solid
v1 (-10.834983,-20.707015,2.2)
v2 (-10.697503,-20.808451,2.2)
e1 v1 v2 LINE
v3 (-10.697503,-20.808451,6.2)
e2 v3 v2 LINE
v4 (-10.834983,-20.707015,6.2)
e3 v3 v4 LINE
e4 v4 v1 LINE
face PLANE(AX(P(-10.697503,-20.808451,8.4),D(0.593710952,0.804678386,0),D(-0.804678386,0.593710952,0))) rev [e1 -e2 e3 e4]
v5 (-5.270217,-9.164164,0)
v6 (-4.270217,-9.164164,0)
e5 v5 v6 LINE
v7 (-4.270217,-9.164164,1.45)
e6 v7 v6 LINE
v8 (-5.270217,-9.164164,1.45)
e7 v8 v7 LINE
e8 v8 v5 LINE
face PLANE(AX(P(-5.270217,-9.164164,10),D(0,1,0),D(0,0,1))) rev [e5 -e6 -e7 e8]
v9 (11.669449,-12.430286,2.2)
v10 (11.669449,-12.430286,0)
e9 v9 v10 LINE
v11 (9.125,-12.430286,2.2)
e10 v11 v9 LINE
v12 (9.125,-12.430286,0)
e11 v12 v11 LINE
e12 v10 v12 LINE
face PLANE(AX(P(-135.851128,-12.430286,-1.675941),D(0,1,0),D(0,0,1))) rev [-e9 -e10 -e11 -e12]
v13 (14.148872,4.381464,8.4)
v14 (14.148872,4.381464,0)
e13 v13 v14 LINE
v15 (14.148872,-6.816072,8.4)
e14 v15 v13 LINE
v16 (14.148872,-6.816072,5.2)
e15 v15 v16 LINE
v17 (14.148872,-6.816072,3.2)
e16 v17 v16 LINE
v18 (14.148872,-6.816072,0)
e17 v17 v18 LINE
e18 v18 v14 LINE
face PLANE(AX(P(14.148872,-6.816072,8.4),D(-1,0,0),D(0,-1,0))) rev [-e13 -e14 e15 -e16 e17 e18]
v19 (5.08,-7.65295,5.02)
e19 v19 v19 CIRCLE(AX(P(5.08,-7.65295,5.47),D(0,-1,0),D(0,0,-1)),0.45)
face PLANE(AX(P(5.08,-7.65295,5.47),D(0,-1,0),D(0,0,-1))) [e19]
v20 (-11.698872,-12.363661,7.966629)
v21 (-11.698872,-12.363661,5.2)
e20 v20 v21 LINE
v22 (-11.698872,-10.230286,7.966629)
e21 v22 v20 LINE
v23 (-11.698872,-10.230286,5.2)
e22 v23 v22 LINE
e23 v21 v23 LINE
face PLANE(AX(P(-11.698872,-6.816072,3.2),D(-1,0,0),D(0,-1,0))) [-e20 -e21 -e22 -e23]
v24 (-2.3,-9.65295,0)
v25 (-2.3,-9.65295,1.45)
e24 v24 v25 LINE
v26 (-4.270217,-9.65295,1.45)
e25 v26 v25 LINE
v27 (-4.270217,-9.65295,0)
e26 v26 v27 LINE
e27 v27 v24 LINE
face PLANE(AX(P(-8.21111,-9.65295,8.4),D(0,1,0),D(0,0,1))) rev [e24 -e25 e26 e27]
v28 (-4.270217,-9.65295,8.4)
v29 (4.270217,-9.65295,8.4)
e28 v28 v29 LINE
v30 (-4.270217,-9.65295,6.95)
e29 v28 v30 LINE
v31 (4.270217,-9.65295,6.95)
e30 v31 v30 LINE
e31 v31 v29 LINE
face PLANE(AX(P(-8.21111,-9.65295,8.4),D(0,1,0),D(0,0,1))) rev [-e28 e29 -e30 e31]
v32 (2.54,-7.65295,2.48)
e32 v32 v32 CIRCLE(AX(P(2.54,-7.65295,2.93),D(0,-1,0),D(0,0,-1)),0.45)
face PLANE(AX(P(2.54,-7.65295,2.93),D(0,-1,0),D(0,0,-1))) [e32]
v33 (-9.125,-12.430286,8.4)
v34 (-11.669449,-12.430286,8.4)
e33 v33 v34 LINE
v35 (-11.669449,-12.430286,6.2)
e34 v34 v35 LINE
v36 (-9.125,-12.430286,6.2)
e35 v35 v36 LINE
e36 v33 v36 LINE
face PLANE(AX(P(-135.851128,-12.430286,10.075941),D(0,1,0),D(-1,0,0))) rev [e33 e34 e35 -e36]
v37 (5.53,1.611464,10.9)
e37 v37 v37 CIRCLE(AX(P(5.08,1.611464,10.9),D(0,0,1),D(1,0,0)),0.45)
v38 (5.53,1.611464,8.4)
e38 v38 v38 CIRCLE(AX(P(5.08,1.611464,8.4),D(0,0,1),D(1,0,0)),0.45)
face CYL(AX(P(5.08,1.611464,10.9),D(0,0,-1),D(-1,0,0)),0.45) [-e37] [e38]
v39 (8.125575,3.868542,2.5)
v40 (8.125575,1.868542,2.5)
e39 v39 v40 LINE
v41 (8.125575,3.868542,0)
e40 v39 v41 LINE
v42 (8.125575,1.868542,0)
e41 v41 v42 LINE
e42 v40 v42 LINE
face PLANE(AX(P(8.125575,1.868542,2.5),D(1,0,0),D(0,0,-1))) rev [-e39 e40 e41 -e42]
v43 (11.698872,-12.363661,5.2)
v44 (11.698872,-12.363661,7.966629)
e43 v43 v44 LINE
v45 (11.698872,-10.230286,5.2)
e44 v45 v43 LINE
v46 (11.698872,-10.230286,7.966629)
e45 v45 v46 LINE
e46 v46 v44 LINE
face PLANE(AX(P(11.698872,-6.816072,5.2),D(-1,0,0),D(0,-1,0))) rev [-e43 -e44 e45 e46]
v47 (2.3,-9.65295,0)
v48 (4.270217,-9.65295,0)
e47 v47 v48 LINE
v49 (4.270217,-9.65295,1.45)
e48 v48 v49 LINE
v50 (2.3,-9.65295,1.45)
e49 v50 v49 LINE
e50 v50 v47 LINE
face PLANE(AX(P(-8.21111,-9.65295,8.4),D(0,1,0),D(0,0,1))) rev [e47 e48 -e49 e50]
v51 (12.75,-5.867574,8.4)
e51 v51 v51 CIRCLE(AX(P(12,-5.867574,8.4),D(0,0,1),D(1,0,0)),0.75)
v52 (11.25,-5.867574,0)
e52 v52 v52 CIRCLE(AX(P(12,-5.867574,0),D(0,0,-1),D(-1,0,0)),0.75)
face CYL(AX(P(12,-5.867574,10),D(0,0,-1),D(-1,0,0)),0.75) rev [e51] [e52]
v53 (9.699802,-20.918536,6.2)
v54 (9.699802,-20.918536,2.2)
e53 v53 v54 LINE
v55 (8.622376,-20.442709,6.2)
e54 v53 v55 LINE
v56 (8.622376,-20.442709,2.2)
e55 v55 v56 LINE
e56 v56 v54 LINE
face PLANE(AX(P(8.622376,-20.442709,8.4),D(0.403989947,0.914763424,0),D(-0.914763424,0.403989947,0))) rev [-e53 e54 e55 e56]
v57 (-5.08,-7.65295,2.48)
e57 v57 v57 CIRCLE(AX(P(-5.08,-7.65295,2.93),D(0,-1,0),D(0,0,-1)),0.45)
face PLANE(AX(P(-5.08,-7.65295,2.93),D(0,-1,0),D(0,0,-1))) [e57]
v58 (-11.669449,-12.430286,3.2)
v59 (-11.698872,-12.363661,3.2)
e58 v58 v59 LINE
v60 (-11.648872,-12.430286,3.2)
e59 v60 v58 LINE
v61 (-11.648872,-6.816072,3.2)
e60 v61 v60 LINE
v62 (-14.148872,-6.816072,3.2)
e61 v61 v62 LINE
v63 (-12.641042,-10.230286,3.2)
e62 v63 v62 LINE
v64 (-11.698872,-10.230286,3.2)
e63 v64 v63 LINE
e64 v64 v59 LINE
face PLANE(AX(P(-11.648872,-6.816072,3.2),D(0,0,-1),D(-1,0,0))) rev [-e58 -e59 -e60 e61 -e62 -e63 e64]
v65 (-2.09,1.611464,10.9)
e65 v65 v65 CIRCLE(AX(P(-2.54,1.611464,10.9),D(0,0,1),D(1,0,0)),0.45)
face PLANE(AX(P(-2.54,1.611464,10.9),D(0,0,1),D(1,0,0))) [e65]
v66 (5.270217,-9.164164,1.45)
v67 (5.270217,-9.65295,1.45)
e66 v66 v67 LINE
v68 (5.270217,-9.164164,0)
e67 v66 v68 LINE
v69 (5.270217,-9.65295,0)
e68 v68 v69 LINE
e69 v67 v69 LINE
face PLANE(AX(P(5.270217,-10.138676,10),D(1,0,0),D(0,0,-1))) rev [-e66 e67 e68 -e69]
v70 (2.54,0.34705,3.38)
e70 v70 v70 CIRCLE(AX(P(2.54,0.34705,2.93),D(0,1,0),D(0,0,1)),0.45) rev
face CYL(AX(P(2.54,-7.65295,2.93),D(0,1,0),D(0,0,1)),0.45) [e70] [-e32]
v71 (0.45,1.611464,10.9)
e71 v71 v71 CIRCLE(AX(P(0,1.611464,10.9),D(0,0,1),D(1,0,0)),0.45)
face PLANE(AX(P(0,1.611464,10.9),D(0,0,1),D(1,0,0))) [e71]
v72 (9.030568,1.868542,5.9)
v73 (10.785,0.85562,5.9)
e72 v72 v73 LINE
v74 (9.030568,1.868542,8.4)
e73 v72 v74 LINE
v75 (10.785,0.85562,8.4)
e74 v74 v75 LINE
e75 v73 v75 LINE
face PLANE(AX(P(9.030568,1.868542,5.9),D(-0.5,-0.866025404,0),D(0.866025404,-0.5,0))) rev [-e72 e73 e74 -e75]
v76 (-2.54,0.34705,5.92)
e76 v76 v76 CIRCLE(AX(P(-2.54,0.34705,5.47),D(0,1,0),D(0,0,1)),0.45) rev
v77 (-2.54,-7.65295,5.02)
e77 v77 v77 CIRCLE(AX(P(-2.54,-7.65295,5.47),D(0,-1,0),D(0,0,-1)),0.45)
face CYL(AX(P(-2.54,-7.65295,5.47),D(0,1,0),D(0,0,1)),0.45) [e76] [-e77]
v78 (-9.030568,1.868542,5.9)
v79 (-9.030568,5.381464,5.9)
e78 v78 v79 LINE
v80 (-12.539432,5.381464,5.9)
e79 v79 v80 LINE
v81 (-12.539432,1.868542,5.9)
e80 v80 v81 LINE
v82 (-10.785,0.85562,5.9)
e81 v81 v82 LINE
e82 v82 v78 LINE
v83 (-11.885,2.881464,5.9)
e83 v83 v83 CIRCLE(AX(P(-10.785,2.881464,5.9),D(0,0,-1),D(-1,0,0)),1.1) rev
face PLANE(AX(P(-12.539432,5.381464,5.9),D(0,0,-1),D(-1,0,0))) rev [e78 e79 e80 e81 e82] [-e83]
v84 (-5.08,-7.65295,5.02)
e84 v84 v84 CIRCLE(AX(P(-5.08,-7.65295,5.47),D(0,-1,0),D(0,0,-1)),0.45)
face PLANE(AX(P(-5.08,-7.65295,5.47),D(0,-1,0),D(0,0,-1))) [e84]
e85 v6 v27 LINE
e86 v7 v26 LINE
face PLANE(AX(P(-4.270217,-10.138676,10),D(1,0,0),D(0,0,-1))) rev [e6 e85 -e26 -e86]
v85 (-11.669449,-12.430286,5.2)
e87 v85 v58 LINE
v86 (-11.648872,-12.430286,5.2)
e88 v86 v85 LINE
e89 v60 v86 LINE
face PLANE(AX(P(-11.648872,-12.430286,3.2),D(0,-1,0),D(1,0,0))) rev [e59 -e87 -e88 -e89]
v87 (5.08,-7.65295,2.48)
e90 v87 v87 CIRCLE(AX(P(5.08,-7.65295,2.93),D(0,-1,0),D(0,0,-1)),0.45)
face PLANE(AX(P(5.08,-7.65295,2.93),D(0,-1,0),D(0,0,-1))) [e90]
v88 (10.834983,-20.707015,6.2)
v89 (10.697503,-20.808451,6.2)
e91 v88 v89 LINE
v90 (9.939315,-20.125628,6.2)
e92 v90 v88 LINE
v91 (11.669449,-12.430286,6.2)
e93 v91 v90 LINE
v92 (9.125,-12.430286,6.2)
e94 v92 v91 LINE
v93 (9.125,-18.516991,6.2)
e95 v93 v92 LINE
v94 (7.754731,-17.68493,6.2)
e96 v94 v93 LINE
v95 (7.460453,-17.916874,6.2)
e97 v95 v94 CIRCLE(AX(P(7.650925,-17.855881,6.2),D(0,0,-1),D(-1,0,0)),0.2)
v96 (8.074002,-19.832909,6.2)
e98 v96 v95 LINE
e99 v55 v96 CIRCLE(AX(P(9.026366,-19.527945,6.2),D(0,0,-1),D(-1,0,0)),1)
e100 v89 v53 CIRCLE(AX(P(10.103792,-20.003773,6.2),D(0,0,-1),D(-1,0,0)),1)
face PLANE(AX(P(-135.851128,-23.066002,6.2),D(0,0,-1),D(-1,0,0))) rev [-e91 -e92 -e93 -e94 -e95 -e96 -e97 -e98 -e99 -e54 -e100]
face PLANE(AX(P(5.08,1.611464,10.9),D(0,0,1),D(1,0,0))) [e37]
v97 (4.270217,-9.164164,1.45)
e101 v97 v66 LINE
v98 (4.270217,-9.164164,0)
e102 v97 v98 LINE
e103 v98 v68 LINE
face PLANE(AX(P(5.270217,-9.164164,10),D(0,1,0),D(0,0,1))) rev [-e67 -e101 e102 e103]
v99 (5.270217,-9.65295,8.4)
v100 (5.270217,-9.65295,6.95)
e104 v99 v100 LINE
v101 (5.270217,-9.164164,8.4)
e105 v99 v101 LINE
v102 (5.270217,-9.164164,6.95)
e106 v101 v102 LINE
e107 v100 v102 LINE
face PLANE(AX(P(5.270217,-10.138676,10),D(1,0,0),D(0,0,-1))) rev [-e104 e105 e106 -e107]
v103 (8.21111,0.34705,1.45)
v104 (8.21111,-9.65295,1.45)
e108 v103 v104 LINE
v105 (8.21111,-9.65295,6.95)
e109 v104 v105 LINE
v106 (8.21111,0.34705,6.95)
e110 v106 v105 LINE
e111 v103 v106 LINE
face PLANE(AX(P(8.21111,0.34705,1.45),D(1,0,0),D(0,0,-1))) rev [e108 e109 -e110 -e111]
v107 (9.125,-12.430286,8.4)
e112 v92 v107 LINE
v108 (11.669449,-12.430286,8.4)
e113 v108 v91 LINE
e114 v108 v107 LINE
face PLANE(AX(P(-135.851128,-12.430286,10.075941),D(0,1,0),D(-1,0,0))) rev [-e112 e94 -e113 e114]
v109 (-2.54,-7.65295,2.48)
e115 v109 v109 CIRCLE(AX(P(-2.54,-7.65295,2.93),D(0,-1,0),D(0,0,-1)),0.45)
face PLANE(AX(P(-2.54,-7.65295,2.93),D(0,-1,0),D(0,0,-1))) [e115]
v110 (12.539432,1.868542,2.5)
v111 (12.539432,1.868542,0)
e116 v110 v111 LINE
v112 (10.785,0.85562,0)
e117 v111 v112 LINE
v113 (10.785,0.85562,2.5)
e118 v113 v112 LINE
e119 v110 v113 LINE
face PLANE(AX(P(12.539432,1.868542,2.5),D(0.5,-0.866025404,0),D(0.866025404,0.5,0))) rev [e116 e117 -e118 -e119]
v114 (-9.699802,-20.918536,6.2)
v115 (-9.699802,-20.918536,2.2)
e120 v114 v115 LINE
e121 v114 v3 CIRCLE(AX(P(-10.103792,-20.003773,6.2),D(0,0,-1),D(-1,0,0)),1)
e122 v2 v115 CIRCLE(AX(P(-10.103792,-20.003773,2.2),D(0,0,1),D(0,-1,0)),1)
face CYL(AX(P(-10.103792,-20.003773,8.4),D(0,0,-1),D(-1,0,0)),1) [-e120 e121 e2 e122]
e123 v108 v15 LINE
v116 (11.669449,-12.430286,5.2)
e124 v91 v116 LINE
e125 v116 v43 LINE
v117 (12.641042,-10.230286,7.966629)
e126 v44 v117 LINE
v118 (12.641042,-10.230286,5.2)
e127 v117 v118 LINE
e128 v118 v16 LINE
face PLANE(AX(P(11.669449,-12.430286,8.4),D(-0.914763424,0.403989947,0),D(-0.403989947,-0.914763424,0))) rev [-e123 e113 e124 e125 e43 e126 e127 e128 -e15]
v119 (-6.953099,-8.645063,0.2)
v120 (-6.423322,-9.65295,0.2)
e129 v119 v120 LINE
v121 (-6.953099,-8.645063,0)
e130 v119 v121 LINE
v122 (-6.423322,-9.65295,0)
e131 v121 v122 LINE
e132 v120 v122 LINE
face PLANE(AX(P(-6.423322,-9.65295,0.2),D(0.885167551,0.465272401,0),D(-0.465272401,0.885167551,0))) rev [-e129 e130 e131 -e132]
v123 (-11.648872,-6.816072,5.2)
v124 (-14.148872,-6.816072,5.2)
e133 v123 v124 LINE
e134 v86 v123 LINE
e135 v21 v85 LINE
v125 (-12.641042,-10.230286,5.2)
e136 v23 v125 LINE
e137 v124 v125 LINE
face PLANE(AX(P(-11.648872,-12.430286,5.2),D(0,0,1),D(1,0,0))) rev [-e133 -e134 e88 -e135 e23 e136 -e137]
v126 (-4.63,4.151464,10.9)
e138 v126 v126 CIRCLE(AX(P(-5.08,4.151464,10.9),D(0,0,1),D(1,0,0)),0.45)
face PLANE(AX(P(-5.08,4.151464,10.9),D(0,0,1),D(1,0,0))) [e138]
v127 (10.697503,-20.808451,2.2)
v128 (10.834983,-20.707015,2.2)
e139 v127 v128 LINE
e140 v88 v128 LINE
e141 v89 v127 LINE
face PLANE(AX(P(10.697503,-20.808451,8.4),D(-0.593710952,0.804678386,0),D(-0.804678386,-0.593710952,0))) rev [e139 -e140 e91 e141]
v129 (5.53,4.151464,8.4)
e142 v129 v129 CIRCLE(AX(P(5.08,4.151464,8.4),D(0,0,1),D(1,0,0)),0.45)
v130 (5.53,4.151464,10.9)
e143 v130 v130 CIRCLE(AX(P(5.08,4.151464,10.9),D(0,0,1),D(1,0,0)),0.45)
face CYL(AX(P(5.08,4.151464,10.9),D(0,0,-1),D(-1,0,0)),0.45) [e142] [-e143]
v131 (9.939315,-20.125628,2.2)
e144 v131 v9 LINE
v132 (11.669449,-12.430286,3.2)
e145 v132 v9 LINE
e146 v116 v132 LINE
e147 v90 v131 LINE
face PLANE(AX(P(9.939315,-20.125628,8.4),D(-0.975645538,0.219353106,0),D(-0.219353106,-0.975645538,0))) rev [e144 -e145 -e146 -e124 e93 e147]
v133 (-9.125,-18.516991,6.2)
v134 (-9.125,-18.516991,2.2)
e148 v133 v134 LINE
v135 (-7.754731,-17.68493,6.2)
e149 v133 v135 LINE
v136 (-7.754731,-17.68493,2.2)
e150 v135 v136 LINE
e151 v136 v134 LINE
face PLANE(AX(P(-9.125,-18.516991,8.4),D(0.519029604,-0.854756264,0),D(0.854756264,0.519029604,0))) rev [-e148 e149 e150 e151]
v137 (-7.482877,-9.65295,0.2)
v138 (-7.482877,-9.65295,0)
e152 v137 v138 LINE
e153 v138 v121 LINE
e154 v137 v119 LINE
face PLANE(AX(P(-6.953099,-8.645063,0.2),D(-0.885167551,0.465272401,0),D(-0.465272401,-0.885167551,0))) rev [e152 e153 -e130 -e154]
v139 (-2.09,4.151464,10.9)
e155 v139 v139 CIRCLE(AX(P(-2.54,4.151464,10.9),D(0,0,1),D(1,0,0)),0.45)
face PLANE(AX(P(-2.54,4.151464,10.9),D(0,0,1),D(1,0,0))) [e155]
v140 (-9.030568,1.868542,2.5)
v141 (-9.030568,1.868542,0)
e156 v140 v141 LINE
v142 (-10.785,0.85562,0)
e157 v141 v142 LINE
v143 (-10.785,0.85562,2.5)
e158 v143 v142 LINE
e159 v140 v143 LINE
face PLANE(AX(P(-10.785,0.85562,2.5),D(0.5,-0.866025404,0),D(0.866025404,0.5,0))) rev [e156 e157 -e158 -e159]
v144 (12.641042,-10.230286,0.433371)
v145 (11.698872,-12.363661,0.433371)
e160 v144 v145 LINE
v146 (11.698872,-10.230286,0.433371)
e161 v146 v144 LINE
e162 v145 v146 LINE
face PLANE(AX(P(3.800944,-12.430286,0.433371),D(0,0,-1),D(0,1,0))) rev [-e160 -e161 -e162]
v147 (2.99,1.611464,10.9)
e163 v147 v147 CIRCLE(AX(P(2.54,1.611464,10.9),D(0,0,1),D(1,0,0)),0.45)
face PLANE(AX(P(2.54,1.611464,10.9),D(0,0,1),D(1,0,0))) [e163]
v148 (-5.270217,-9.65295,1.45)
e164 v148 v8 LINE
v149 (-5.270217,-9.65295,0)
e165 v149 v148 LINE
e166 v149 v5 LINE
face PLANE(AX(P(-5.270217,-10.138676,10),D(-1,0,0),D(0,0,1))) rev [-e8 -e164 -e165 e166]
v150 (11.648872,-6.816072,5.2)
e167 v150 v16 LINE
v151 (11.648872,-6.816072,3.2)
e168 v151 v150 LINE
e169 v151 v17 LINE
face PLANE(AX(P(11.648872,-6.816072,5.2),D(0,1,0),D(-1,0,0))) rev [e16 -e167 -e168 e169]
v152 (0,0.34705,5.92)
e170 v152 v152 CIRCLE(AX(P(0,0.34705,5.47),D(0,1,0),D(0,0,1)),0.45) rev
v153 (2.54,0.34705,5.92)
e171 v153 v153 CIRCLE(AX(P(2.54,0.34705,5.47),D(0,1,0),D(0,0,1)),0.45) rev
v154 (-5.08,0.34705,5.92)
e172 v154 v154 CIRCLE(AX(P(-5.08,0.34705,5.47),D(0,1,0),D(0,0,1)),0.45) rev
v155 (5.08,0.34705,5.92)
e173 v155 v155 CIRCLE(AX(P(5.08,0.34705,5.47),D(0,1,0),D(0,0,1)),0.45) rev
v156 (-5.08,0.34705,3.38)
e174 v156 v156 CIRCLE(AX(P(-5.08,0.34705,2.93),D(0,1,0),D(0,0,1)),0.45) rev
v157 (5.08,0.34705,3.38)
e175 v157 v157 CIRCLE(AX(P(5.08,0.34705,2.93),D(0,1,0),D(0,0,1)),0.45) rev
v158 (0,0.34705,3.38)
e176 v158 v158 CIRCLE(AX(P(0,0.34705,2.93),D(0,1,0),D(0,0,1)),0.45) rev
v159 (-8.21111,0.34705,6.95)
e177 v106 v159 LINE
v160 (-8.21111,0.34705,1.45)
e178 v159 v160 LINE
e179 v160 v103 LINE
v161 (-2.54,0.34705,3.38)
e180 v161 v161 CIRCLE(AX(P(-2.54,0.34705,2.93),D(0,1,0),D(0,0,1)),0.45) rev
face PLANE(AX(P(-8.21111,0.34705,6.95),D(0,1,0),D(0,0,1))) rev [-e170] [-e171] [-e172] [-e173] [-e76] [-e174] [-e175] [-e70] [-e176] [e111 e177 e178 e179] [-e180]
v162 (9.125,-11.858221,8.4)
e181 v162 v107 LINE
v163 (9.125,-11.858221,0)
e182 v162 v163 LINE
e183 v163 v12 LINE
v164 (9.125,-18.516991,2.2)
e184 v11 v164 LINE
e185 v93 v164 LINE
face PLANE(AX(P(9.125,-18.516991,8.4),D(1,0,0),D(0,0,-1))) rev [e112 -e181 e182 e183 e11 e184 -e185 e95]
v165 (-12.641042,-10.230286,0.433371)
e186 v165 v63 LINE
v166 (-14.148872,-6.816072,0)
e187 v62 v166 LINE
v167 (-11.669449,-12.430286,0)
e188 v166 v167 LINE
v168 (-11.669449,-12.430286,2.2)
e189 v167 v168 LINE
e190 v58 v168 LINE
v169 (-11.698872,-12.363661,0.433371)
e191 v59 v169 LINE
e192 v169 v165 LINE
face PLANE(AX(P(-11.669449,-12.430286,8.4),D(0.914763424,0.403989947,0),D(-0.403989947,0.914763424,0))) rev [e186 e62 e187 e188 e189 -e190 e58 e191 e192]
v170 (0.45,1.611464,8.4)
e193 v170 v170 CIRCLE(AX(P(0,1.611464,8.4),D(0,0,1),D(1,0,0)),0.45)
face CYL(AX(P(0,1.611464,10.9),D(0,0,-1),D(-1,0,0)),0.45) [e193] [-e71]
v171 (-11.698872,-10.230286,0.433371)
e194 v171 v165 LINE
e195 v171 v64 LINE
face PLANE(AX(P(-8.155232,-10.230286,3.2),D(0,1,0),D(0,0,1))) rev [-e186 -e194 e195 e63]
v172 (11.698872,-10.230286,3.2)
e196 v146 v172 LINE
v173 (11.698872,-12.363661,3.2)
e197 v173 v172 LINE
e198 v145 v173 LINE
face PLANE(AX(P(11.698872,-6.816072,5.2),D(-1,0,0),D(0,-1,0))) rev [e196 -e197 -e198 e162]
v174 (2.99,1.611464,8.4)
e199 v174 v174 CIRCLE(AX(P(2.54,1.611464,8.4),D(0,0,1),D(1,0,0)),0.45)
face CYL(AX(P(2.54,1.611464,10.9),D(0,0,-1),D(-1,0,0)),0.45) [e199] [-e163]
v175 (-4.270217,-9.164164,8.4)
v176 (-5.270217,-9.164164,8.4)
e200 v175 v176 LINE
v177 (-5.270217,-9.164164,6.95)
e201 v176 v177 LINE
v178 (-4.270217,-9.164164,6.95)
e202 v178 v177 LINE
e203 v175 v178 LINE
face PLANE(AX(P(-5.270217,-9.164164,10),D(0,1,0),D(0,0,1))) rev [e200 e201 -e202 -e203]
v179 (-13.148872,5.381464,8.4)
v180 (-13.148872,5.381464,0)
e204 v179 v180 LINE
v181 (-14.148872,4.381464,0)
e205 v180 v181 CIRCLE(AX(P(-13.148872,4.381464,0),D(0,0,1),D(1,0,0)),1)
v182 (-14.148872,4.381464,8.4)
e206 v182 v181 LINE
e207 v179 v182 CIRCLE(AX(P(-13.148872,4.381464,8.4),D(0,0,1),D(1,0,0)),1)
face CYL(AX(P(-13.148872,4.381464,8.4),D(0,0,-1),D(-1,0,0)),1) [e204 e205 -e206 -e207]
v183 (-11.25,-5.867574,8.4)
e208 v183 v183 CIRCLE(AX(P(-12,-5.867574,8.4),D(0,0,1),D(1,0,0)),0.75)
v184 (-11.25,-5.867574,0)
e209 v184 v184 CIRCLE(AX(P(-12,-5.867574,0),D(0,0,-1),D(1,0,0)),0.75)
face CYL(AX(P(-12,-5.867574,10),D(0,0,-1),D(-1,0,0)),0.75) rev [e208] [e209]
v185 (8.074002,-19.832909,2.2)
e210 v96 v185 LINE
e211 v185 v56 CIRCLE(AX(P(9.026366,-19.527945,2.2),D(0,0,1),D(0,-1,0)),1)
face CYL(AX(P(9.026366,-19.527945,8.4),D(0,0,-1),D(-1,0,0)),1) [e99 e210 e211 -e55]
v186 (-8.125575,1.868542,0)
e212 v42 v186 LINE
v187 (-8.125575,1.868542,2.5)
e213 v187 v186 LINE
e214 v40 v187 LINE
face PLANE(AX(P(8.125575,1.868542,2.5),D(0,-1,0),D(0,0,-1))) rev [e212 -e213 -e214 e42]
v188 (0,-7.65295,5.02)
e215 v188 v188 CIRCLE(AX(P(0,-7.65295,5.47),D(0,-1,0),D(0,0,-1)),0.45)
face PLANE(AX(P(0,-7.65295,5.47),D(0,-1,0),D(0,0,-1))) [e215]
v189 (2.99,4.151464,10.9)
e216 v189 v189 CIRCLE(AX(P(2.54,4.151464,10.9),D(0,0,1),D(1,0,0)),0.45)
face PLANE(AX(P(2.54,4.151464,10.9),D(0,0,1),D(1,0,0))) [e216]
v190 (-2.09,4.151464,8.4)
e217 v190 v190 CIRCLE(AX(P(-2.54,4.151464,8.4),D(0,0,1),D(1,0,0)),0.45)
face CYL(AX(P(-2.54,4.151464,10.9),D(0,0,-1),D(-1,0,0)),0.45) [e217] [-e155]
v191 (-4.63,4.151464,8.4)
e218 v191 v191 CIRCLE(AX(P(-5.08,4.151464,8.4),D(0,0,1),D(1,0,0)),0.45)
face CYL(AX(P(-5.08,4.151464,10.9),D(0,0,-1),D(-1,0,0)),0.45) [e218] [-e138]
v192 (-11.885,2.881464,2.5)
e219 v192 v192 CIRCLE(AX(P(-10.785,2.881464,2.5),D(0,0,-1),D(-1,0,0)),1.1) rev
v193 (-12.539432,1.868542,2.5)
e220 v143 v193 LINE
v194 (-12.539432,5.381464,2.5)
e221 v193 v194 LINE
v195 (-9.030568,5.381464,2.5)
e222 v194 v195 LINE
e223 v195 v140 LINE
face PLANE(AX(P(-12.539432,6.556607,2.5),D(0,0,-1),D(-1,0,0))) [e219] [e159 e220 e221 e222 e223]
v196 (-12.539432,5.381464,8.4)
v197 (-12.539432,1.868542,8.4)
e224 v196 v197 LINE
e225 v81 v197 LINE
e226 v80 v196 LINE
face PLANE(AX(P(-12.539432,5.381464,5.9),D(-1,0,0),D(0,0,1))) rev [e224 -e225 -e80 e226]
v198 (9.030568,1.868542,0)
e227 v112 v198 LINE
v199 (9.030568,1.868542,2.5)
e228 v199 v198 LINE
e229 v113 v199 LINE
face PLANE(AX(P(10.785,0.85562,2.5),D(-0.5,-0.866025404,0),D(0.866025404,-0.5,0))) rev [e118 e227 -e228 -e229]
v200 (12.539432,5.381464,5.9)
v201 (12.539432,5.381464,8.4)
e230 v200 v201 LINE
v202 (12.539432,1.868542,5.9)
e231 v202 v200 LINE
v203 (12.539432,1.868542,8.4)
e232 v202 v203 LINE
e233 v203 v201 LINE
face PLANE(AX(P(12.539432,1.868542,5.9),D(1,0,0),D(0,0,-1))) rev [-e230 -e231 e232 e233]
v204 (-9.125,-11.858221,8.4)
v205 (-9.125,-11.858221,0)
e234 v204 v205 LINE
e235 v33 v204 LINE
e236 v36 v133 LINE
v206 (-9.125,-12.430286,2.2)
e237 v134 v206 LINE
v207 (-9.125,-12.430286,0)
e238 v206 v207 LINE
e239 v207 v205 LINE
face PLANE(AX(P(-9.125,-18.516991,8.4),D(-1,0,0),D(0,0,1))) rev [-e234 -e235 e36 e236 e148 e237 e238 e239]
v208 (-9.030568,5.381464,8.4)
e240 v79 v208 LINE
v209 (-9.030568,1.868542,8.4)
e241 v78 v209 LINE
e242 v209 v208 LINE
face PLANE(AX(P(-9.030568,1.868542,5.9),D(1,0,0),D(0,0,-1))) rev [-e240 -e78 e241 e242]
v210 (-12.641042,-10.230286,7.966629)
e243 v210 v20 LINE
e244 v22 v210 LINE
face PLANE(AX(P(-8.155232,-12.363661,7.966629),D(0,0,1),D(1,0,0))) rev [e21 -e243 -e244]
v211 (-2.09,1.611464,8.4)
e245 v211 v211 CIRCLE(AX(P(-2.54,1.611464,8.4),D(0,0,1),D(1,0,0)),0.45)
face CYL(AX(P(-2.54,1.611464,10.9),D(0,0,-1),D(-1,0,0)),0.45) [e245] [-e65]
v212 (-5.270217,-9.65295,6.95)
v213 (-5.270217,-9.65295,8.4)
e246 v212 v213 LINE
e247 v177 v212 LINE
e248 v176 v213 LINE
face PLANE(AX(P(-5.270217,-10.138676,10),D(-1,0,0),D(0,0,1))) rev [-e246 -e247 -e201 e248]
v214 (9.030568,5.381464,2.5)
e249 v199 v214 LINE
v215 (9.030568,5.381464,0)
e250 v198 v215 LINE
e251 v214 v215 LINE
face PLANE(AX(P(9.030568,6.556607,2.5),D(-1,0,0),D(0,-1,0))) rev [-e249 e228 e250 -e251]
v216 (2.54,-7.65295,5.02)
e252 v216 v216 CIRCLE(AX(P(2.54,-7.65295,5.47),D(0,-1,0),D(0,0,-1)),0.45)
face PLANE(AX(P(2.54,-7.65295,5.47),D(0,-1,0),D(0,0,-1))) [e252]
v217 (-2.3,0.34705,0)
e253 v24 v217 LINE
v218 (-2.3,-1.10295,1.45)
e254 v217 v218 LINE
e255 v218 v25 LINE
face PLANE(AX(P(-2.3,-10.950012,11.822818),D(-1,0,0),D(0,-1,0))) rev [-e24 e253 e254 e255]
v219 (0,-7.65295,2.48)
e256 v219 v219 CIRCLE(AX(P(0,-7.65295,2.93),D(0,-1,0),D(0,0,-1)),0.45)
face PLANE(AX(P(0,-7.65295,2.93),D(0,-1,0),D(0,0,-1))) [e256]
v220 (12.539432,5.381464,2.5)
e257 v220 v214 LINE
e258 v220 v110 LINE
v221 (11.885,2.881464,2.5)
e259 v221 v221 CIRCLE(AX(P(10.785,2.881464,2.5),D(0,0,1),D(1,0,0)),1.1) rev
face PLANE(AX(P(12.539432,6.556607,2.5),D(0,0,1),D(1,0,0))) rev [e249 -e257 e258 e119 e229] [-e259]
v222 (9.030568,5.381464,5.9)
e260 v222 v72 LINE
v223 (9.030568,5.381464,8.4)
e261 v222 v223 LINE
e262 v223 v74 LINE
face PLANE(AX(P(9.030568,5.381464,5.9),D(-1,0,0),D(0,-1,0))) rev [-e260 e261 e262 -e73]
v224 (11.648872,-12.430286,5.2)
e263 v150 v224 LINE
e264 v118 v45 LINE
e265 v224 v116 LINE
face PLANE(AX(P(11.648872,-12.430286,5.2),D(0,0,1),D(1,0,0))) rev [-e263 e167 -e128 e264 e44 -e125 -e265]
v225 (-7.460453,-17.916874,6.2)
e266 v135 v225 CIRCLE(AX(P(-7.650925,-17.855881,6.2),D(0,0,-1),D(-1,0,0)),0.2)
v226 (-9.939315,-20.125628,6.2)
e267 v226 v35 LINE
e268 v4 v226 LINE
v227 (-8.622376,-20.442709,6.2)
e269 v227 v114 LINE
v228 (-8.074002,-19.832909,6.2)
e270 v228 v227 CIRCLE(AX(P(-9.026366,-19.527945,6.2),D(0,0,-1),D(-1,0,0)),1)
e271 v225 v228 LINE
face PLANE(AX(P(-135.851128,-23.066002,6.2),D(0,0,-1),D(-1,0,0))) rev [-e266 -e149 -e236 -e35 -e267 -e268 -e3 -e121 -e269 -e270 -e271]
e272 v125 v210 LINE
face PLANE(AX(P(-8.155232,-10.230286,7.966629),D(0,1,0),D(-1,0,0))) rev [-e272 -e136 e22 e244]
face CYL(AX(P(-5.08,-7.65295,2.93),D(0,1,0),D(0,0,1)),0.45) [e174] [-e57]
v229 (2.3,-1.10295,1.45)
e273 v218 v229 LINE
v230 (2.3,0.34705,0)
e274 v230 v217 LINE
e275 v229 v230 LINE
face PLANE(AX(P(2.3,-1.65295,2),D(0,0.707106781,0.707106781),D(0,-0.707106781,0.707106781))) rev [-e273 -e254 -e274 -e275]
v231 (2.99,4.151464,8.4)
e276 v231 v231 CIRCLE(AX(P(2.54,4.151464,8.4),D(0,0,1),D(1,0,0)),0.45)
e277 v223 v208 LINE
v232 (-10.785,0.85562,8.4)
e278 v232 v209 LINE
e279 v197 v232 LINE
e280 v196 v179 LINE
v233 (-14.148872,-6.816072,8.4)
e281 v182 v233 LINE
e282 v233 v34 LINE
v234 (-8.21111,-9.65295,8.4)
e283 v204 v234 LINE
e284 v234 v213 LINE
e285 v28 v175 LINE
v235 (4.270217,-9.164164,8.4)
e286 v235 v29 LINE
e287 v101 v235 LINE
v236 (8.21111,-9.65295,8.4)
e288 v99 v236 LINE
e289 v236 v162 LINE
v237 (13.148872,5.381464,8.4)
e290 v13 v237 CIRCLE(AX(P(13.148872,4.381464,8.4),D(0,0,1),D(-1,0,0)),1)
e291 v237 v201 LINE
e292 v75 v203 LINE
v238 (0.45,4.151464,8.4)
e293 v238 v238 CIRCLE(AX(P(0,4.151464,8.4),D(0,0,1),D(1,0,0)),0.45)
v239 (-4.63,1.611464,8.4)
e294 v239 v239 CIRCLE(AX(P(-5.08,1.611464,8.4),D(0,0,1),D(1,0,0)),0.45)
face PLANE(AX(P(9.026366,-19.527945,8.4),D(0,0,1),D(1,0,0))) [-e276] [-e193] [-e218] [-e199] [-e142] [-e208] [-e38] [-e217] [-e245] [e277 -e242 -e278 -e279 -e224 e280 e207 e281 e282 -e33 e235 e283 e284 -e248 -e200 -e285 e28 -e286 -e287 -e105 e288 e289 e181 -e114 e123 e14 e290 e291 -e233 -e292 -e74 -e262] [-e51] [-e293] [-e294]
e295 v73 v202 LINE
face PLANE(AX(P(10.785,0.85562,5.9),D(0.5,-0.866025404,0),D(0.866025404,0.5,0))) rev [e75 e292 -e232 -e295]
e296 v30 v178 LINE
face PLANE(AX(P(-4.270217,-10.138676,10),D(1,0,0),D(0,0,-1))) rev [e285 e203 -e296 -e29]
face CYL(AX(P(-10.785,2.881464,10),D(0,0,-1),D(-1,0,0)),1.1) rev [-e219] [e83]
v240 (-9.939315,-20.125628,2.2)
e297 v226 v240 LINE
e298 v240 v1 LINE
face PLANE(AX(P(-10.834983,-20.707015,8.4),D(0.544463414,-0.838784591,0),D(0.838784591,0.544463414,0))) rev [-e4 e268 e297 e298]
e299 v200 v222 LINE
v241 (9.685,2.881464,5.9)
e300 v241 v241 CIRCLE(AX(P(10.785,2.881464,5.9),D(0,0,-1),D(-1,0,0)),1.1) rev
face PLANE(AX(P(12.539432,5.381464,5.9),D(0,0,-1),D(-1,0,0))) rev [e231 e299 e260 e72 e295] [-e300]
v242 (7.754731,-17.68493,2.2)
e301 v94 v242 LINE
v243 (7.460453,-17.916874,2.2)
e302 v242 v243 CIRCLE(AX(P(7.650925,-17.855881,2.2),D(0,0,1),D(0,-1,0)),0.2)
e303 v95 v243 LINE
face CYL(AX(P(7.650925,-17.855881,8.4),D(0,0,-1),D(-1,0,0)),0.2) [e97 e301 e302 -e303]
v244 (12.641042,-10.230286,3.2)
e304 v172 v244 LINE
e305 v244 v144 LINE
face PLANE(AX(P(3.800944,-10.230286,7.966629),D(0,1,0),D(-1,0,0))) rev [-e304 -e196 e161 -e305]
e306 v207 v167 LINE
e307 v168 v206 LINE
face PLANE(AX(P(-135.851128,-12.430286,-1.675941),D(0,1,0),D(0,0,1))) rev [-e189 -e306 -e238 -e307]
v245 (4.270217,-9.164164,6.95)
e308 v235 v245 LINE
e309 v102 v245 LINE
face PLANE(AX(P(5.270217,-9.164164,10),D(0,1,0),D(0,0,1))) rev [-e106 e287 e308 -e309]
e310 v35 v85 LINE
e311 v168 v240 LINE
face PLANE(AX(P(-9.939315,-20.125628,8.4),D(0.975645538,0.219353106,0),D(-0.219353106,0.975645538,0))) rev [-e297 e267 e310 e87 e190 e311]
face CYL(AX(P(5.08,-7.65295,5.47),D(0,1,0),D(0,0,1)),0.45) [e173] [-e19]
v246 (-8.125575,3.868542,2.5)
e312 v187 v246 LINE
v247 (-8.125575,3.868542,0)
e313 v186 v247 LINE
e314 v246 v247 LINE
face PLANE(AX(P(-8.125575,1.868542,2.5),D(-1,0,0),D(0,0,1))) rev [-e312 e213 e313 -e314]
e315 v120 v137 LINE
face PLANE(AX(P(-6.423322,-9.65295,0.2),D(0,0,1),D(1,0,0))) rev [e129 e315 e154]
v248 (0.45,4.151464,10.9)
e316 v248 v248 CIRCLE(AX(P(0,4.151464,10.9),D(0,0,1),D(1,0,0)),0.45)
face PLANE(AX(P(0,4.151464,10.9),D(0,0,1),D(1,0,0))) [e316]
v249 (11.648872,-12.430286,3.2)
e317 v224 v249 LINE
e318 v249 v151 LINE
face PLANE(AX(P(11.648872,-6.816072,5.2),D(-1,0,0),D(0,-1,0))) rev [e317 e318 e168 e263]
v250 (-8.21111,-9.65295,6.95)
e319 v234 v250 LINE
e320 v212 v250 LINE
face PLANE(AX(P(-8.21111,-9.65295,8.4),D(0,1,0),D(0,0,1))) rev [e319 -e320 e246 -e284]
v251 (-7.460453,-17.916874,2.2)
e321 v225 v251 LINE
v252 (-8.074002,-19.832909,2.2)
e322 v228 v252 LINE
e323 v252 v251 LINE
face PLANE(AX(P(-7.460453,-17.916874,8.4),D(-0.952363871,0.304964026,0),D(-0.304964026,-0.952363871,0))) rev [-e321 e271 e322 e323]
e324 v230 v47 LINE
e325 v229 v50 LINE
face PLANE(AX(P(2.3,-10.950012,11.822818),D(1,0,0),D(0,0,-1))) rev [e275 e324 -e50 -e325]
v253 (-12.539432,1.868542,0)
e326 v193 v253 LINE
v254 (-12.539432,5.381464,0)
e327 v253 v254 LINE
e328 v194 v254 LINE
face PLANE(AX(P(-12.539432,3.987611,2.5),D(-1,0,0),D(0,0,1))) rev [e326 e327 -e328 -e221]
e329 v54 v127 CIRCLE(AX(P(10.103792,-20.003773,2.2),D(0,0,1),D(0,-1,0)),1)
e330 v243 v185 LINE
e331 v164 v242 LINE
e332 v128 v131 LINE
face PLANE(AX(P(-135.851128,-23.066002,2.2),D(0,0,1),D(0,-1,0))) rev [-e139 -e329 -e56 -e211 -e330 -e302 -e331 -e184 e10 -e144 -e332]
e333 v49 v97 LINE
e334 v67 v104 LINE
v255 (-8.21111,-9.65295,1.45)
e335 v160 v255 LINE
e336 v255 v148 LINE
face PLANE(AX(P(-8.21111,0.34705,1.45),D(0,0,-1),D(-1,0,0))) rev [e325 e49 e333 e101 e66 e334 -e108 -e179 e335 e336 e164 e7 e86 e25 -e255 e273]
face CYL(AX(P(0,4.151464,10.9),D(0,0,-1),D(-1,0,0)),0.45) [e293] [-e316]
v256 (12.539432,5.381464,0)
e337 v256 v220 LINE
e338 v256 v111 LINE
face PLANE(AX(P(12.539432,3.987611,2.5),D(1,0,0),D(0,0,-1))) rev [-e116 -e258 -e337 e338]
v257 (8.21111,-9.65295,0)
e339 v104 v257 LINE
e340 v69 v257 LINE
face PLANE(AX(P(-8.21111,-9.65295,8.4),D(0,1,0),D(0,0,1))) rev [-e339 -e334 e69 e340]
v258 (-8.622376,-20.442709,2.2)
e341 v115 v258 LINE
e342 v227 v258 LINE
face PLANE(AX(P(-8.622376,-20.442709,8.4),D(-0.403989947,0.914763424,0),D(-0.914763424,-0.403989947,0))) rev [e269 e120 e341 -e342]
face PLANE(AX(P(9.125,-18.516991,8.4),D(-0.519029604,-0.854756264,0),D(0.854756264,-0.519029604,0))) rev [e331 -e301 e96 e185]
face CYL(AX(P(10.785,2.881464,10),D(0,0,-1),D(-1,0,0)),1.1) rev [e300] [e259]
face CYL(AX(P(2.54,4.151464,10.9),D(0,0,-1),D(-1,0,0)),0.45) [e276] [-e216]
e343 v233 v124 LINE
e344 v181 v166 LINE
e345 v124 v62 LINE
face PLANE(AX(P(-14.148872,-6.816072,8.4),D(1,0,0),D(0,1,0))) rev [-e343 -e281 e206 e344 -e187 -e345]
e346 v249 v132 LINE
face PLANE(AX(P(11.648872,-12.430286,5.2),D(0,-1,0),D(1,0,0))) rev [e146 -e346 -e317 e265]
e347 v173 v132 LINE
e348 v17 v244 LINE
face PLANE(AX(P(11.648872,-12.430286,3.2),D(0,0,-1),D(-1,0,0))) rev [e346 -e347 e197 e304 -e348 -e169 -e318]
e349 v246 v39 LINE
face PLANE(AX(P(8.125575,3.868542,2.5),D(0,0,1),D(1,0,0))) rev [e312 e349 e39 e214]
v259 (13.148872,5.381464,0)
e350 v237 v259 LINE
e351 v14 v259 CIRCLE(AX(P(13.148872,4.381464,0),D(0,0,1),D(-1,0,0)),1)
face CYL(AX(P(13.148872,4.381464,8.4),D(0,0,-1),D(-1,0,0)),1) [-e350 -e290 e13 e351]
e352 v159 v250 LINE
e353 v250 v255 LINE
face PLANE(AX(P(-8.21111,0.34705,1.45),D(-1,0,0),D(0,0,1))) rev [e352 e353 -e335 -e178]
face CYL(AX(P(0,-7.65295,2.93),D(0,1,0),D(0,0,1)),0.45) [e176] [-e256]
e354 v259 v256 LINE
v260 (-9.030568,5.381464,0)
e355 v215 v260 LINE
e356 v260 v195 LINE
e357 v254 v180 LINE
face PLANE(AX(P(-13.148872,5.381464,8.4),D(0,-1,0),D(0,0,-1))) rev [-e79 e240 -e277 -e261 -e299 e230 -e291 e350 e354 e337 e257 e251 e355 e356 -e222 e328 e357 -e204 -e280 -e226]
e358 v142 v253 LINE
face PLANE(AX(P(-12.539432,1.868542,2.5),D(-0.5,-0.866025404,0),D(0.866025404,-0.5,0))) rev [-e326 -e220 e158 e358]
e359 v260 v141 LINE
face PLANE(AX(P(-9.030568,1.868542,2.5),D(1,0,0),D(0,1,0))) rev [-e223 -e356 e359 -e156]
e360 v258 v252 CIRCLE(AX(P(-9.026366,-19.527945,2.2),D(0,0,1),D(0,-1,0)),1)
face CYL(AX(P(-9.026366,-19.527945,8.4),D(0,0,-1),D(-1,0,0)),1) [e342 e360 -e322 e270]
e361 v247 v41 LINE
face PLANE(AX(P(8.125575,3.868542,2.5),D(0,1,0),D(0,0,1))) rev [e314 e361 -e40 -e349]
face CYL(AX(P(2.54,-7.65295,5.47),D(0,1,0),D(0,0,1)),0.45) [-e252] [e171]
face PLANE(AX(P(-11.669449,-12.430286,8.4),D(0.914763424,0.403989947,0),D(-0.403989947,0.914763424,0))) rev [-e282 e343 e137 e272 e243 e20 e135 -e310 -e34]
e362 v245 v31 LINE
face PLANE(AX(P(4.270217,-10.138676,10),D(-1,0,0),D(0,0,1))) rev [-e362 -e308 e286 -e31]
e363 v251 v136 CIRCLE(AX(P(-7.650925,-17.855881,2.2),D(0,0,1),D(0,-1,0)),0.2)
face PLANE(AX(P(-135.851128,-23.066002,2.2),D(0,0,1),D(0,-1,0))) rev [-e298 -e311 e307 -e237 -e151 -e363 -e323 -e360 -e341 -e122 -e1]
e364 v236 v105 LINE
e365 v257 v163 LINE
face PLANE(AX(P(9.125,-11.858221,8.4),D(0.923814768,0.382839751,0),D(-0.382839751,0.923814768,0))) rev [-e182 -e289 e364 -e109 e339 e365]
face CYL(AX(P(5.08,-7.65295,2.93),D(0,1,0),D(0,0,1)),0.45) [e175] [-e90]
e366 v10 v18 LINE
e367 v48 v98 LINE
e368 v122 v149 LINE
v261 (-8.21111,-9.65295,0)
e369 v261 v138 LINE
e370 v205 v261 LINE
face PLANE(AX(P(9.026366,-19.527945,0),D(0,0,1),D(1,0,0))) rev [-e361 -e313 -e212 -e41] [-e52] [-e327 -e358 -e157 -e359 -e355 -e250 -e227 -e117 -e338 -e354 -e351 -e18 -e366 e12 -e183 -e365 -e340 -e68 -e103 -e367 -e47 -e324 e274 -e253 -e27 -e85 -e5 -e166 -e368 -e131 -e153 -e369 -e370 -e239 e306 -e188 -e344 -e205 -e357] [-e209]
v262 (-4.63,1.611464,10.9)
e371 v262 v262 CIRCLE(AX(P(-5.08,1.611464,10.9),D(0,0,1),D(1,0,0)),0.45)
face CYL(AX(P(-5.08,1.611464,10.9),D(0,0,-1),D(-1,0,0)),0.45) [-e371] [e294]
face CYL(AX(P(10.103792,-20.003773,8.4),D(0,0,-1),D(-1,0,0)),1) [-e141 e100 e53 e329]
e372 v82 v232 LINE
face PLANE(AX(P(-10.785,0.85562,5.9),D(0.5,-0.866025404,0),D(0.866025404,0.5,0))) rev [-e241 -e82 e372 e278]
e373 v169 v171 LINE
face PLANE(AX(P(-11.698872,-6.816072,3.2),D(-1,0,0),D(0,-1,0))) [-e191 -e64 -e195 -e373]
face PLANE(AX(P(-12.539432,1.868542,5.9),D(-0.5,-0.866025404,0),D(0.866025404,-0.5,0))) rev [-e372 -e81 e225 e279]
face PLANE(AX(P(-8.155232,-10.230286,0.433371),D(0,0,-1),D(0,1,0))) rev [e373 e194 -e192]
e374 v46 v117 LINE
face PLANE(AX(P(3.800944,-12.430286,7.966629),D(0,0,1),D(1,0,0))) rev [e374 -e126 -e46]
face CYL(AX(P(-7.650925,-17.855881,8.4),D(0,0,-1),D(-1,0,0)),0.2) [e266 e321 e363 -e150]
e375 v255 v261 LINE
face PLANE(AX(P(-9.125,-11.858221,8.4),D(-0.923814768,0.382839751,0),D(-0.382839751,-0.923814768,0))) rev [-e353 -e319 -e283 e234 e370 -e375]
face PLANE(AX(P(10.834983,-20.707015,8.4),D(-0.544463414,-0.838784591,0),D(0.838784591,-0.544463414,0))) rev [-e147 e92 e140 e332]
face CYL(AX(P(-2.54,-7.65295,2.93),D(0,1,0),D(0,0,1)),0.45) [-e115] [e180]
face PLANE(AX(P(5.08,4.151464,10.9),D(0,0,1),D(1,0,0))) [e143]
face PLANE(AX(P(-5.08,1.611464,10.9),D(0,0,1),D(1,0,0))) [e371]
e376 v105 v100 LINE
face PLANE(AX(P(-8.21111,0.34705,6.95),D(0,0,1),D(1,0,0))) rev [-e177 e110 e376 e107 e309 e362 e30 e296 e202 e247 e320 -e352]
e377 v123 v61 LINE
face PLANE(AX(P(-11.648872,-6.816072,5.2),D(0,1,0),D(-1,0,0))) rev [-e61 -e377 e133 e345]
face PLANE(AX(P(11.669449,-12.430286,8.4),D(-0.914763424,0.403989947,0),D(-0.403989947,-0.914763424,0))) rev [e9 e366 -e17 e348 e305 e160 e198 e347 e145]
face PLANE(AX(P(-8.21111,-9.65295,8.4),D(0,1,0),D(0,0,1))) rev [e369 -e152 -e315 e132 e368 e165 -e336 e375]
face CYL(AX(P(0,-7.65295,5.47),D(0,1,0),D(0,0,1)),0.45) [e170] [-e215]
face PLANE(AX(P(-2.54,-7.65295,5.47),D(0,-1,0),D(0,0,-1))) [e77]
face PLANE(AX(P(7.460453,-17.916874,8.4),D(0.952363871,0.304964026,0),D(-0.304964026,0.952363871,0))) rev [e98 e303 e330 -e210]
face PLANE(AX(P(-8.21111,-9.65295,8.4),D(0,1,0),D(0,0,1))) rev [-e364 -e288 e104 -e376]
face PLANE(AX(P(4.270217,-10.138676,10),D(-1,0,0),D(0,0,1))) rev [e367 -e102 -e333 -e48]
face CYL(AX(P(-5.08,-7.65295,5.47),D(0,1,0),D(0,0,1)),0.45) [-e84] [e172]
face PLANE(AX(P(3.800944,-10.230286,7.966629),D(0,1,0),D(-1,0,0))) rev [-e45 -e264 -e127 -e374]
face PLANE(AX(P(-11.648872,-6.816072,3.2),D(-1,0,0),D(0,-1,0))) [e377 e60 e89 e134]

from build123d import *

# Parameters (mm, degrees)
EXTRUDE_1_DEPTH      = 8.4
SKETCH_2_W           = 3.875941336
SKETCH_2_H           = 10.635716013
CUT_EXTRUDE_1_DEPTH  = 150
SKETCH_3_W           = 2
SKETCH_3_H           = 5.614214587
CUT_EXTRUDE_2_DEPTH  = 2.5
SKETCH_4_W           = 7.533258122
SKETCH_4_H           = 2.2
CUT_EXTRUDE_3_DEPTH  = 2.45
SKETCH_5_W           = 2
SKETCH_5_H           = 5.614214587
CUT_EXTRUDE_4_DEPTH  = 2.5
SKETCH_6_W           = 2.766629061
SKETCH_6_H           = 2.133374911
CUT_EXTRUDE_5_DEPTH  = 2.45
SKETCH_7_W           = 16.422219314
SKETCH_7_H           = 5.5
CUT_EXTRUDE_6_DEPTH  = 10
SKETCH_8_R           = 0.45
EXTRUDE_2_DEPTH      = 8
SKETCH_9_R           = 1.1
SKETCH_9_R_2         = 0.75
SKETCH_9_W           = 1
SKETCH_9_H           = 0.97451262
CUT_EXTRUDE_7_DEPTH  = 10
SKETCH_10_W          = 16.251149316
SKETCH_10_H          = 2
CUT_EXTRUDE_8_DEPTH  = 2.5
CUT_EXTRUDE_9_DEPTH  = 2.5
SKETCH_12_W          = 4.6
SKETCH_12_H          = 9.297061896
CUT_EXTRUDE_10_DEPTH = 1.45
CHAMFER_1_SIZE       = 2
CUT_EXTRUDE_11_DEPTH = 0.2
SKETCH_14_R          = 0.45
EXTRUDE_3_DEPTH      = 2.5


with BuildPart() as part:
    # Эскиз1 → Вытянуть1 (new body)
    with BuildSketch(Plane.XY):
        with BuildLine():
            Line((-9.125, -11.858221261), (-8.211109657, -9.652950274))
            Line((-8.211109657, -9.652950274), (8.211109657, -9.652950274))
            Line((8.211109657, -9.652950274), (9.125, -11.858221261))
            Line((9.125, -11.858221261), (9.125, -18.516991449))
            Line((9.125, -18.516991449), (7.754731336, -17.684929687))
            ThreePointArc((7.754731336, -17.684929687), (7.527121952, -17.698805472), (7.460452641, -17.916873745))
            Line((7.460452641, -17.916873745), (8.074001716, -19.832909478))
            ThreePointArc((8.074001716, -19.832909478), (8.282801368, -20.196609982), (8.622375639, -20.442708876))
            Line((8.622375639, -20.442708876), (9.699802329, -20.918536331))
            ThreePointArc((9.699802329, -20.918536331), (10.213465399, -20.997740615), (10.697503229, -20.808451293))
            Line((10.697503229, -20.808451293), (10.834983302, -20.707015208))
            Line((10.834983302, -20.707015208), (9.939315034, -20.125628034))
            Line((9.939315034, -20.125628034), (11.669448618, -12.430286305))
            Line((11.669448618, -12.430286305), (14.148872473, -6.816071718))
            Line((14.148872473, -6.816071718), (14.148872473, 4.381463669))
            ThreePointArc((14.148872473, 4.381463669), (13.855979254, 5.08857045), (13.148872473, 5.381463669))
            Line((13.148872473, 5.381463669), (-13.148872473, 5.381463669))
            ThreePointArc((-13.148872473, 5.381463669), (-13.855979254, 5.08857045), (-14.148872473, 4.381463669))
            Line((-14.148872473, 4.381463669), (-14.148872473, -6.816071718))
            Line((-14.148872473, -6.816071718), (-11.669448618, -12.430286305))
            Line((-11.669448618, -12.430286305), (-9.939315034, -20.125628034))
            Line((-9.939315034, -20.125628034), (-10.834983302, -20.707015208))
            Line((-10.834983302, -20.707015208), (-10.697503229, -20.808451293))
            ThreePointArc((-10.697503229, -20.808451293), (-10.213465399, -20.997740615), (-9.699802329, -20.918536331))
            Line((-9.699802329, -20.918536331), (-8.622375639, -20.442708876))
            ThreePointArc((-8.622375639, -20.442708876), (-8.282801368, -20.196609982), (-8.074001716, -19.832909478))
            Line((-8.074001716, -19.832909478), (-7.460452641, -17.916873745))
            ThreePointArc((-7.460452641, -17.916873745), (-7.527121952, -17.698805472), (-7.754731336, -17.684929687))
            Line((-7.754731336, -17.684929687), (-9.125, -18.516991449))
            Line((-9.125, -18.516991449), (-9.125, -11.858221261))
        make_face()
    extrude(amount=EXTRUDE_1_DEPTH)

    # Эскиз2 → Вырез-Вытянуть1 (cut)
    with BuildSketch(Plane(origin=(14.148872473, 0, 0), x_dir=(0, 0, -1), z_dir=(1, 0, 0))):
        with Locations((-8.137970668, -17.748144312)):
            Rectangle(SKETCH_2_W, SKETCH_2_H)
        with Locations((-0.262029332, -17.748144312)):
            Rectangle(SKETCH_2_W, SKETCH_2_H)
    extrude(amount=-CUT_EXTRUDE_1_DEPTH, mode=Mode.SUBTRACT)

    # Эскиз3 → Вырез-Вытянуть2 (cut)
    with BuildSketch(Plane(origin=(14.148872473, 0, 0), x_dir=(0, 0, -1), z_dir=(1, 0, 0))):
        with Locations((-4.2, -9.623179012)):
            Rectangle(SKETCH_3_W, SKETCH_3_H)
    extrude(amount=-CUT_EXTRUDE_2_DEPTH, mode=Mode.SUBTRACT)

    # Эскиз4 → Вырез-Вытянуть3 (cut)
    with BuildSketch(Plane(origin=(14.148872473, 0, 0), x_dir=(0, 0, -1), z_dir=(1, 0, 0))):
        with Locations((-4.2, -11.330286305)):
            Rectangle(SKETCH_4_W, SKETCH_4_H)
    extrude(amount=-CUT_EXTRUDE_3_DEPTH, mode=Mode.SUBTRACT)

    # Эскиз5 → Вырез-Вытянуть4 (cut)
    with BuildSketch(Plane.ZY.offset(14.148872473)):
        with Locations((4.2, -9.623179012)):
            Rectangle(SKETCH_5_W, SKETCH_5_H)
    extrude(amount=-CUT_EXTRUDE_4_DEPTH, mode=Mode.SUBTRACT)

    # Эскиз6 → Вырез-Вытянуть5 (cut)
    with BuildSketch(Plane.ZY.offset(14.148872473)):
        with Locations((6.583314531, -11.296973761)):
            Rectangle(SKETCH_6_W, SKETCH_6_H)
        with Locations((1.81668547, -11.296973761)):
            Rectangle(SKETCH_6_W, SKETCH_6_H)
    extrude(amount=-CUT_EXTRUDE_5_DEPTH, mode=Mode.SUBTRACT)

    # Эскиз7 → Вырез-Вытянуть6 (cut)
    with BuildSketch(Plane.XZ.offset(9.652950274)):
        with Locations((0, 4.2)):
            Rectangle(SKETCH_7_W, SKETCH_7_H)
    extrude(amount=-CUT_EXTRUDE_6_DEPTH, mode=Mode.SUBTRACT)

    # Эскиз8 → Вытянуть2 (add)
    with BuildSketch(Plane.XZ.offset(-0.347049726)):
        with Locations(Location((0, 2.93, 0), (0, 0, 90))):
            Circle(SKETCH_8_R)
        with Locations(Location((0, 5.47, 0), (0, 0, 90))):
            Circle(SKETCH_8_R)
        with Locations(Location((2.54, 5.47, 0), (0, 0, 90))):
            Circle(SKETCH_8_R)
        with Locations(Location((2.54, 2.93, 0), (0, 0, 90))):
            Circle(SKETCH_8_R)
        with Locations(Location((5.08, 5.47, 0), (0, 0, 90))):
            Circle(SKETCH_8_R)
        with Locations(Location((5.08, 2.93, 0), (0, 0, 90))):
            Circle(SKETCH_8_R)
        with Locations(Location((-2.54, 5.47, 0), (0, 0, 90))):
            Circle(SKETCH_8_R)
        with Locations(Location((-2.54, 2.93, 0), (0, 0, 90))):
            Circle(SKETCH_8_R)
        with Locations(Location((-5.08, 5.47, 0), (0, 0, 90))):
            Circle(SKETCH_8_R)
        with Locations(Location((-5.08, 2.93, 0), (0, 0, 90))):
            Circle(SKETCH_8_R)
    extrude(amount=EXTRUDE_2_DEPTH)

    # Эскиз9 → Вырез-Вытянуть7 (cut)
    with BuildSketch(Plane(origin=(0, 0, 0), x_dir=(-1, 0, 0), z_dir=(0, 0, -1))):
        with Locations((-10.785, 2.881463669)):
            Circle(SKETCH_9_R)
        with Locations((10.785, 2.881463669)):
            Circle(SKETCH_9_R)
        with Locations((-12, -5.867574023)):
            Circle(SKETCH_9_R_2)
        with Locations(Location((12, -5.867574023, 0), (0, 0, 180))):
            Circle(SKETCH_9_R_2)
        with Locations((4.770217249, -9.651420054)):
            Rectangle(SKETCH_9_W, SKETCH_9_H)
        with Locations((-4.770217249, -9.651420054)):
            Rectangle(SKETCH_9_W, SKETCH_9_H)
    extrude(amount=-CUT_EXTRUDE_7_DEPTH, mode=Mode.SUBTRACT)

    # Эскиз10 → Вырез-Вытянуть8 (cut)
    with BuildSketch(Plane(origin=(0, 0, 0), x_dir=(-1, 0, 0), z_dir=(0, 0, -1))):
        Polygon((-12.539432173, 3.987610768), (-12.539432173, 6.55660708), (-9.030567827, 6.55660708), (-9.030567827, 3.987610768), (-9.030567827, 1.868541782), (-10.785, 0.855619895), (-12.539432173, 1.868541782), align=None)
        Polygon((9.030567827, 6.55660708), (9.030567827, 3.987610768), (9.030567827, 1.868541782), (10.785, 0.855619895), (12.539432173, 1.868541782), (12.539432173, 3.987610768), (12.539432173, 6.55660708), align=None)
        with Locations((0, 2.868541782)):
            Rectangle(SKETCH_10_W, SKETCH_10_H)
    extrude(amount=-CUT_EXTRUDE_8_DEPTH, mode=Mode.SUBTRACT)

    # Эскиз11 → Вырез-Вытянуть9 (cut)
    with BuildSketch(Plane.XY.offset(8.4)):
        Polygon((12.539432173, 1.868541782), (12.539432173, 5.381463669), (9.030567827, 5.381463669), (9.030567827, 1.868541782), (10.785, 0.855619895), align=None)
        Polygon((-9.030567827, 5.381463669), (-12.539432173, 5.381463669), (-12.539432173, 1.868541782), (-10.785, 0.855619895), (-9.030567827, 1.868541782), align=None)
    extrude(amount=-CUT_EXTRUDE_9_DEPTH, mode=Mode.SUBTRACT)

    # Эскиз12 → Вырез-Вытянуть10 (cut)
    with BuildSketch(Plane(origin=(0, 0, 0), x_dir=(-1, 0, 0), z_dir=(0, 0, -1))):
        with Locations((0, -6.301481222)):
            Rectangle(SKETCH_12_W, SKETCH_12_H)
    extrude(amount=-CUT_EXTRUDE_10_DEPTH, mode=Mode.SUBTRACT)

    # Фаска1
    # the kernel refuses this chamfer: 2 mm, written as the material it takes off along each edge
    with BuildSketch(Plane(origin=(-2.3, -1.652950274, 0), x_dir=(0, 0.9996219169112968, -0.027495876610586365), z_dir=(1, 0, 0))) as chamfer_1_piece_1:
        Polygon((CHAMFER_1_SIZE * 0.999621916911, CHAMFER_1_SIZE * 0.0274958766106), (-CHAMFER_1_SIZE * 0.0274958766106, CHAMFER_1_SIZE * 0.999621916911), (0, 0), align=None)
    extrude(amount=4.6, mode=Mode.SUBTRACT)

    # Эскиз13 → Вырез-Вытянуть11 (cut)
    with BuildSketch(Plane(origin=(0, 0, 0), x_dir=(-1, 0, 0), z_dir=(0, 0, -1))):
        Polygon((6.423321525, -9.652950274), (7.482877419, -9.652950274), (6.953099472, -8.645062752), align=None)
    extrude(amount=-CUT_EXTRUDE_11_DEPTH, mode=Mode.SUBTRACT)

    # Эскиз14 → Вытянуть3 (add)
    with BuildSketch(Plane.XY.offset(8.4)):
        with Locations((0, 4.151463669)):
            Circle(SKETCH_14_R)
        with Locations((0, 1.611463669)):
            Circle(SKETCH_14_R)
        with Locations((2.54, 4.151463669)):
            Circle(SKETCH_14_R)
        with Locations((2.54, 1.611463669)):
            Circle(SKETCH_14_R)
        with Locations((5.08, 4.151463669)):
            Circle(SKETCH_14_R)
        with Locations((5.08, 1.611463669)):
            Circle(SKETCH_14_R)
        with Locations((-2.54, 4.151463669)):
            Circle(SKETCH_14_R)
        with Locations((-2.54, 1.611463669)):
            Circle(SKETCH_14_R)
        with Locations((-5.08, 4.151463669)):
            Circle(SKETCH_14_R)
        with Locations((-5.08, 1.611463669)):
            Circle(SKETCH_14_R)
    extrude(amount=EXTRUDE_3_DEPTH)


solid = part.part
